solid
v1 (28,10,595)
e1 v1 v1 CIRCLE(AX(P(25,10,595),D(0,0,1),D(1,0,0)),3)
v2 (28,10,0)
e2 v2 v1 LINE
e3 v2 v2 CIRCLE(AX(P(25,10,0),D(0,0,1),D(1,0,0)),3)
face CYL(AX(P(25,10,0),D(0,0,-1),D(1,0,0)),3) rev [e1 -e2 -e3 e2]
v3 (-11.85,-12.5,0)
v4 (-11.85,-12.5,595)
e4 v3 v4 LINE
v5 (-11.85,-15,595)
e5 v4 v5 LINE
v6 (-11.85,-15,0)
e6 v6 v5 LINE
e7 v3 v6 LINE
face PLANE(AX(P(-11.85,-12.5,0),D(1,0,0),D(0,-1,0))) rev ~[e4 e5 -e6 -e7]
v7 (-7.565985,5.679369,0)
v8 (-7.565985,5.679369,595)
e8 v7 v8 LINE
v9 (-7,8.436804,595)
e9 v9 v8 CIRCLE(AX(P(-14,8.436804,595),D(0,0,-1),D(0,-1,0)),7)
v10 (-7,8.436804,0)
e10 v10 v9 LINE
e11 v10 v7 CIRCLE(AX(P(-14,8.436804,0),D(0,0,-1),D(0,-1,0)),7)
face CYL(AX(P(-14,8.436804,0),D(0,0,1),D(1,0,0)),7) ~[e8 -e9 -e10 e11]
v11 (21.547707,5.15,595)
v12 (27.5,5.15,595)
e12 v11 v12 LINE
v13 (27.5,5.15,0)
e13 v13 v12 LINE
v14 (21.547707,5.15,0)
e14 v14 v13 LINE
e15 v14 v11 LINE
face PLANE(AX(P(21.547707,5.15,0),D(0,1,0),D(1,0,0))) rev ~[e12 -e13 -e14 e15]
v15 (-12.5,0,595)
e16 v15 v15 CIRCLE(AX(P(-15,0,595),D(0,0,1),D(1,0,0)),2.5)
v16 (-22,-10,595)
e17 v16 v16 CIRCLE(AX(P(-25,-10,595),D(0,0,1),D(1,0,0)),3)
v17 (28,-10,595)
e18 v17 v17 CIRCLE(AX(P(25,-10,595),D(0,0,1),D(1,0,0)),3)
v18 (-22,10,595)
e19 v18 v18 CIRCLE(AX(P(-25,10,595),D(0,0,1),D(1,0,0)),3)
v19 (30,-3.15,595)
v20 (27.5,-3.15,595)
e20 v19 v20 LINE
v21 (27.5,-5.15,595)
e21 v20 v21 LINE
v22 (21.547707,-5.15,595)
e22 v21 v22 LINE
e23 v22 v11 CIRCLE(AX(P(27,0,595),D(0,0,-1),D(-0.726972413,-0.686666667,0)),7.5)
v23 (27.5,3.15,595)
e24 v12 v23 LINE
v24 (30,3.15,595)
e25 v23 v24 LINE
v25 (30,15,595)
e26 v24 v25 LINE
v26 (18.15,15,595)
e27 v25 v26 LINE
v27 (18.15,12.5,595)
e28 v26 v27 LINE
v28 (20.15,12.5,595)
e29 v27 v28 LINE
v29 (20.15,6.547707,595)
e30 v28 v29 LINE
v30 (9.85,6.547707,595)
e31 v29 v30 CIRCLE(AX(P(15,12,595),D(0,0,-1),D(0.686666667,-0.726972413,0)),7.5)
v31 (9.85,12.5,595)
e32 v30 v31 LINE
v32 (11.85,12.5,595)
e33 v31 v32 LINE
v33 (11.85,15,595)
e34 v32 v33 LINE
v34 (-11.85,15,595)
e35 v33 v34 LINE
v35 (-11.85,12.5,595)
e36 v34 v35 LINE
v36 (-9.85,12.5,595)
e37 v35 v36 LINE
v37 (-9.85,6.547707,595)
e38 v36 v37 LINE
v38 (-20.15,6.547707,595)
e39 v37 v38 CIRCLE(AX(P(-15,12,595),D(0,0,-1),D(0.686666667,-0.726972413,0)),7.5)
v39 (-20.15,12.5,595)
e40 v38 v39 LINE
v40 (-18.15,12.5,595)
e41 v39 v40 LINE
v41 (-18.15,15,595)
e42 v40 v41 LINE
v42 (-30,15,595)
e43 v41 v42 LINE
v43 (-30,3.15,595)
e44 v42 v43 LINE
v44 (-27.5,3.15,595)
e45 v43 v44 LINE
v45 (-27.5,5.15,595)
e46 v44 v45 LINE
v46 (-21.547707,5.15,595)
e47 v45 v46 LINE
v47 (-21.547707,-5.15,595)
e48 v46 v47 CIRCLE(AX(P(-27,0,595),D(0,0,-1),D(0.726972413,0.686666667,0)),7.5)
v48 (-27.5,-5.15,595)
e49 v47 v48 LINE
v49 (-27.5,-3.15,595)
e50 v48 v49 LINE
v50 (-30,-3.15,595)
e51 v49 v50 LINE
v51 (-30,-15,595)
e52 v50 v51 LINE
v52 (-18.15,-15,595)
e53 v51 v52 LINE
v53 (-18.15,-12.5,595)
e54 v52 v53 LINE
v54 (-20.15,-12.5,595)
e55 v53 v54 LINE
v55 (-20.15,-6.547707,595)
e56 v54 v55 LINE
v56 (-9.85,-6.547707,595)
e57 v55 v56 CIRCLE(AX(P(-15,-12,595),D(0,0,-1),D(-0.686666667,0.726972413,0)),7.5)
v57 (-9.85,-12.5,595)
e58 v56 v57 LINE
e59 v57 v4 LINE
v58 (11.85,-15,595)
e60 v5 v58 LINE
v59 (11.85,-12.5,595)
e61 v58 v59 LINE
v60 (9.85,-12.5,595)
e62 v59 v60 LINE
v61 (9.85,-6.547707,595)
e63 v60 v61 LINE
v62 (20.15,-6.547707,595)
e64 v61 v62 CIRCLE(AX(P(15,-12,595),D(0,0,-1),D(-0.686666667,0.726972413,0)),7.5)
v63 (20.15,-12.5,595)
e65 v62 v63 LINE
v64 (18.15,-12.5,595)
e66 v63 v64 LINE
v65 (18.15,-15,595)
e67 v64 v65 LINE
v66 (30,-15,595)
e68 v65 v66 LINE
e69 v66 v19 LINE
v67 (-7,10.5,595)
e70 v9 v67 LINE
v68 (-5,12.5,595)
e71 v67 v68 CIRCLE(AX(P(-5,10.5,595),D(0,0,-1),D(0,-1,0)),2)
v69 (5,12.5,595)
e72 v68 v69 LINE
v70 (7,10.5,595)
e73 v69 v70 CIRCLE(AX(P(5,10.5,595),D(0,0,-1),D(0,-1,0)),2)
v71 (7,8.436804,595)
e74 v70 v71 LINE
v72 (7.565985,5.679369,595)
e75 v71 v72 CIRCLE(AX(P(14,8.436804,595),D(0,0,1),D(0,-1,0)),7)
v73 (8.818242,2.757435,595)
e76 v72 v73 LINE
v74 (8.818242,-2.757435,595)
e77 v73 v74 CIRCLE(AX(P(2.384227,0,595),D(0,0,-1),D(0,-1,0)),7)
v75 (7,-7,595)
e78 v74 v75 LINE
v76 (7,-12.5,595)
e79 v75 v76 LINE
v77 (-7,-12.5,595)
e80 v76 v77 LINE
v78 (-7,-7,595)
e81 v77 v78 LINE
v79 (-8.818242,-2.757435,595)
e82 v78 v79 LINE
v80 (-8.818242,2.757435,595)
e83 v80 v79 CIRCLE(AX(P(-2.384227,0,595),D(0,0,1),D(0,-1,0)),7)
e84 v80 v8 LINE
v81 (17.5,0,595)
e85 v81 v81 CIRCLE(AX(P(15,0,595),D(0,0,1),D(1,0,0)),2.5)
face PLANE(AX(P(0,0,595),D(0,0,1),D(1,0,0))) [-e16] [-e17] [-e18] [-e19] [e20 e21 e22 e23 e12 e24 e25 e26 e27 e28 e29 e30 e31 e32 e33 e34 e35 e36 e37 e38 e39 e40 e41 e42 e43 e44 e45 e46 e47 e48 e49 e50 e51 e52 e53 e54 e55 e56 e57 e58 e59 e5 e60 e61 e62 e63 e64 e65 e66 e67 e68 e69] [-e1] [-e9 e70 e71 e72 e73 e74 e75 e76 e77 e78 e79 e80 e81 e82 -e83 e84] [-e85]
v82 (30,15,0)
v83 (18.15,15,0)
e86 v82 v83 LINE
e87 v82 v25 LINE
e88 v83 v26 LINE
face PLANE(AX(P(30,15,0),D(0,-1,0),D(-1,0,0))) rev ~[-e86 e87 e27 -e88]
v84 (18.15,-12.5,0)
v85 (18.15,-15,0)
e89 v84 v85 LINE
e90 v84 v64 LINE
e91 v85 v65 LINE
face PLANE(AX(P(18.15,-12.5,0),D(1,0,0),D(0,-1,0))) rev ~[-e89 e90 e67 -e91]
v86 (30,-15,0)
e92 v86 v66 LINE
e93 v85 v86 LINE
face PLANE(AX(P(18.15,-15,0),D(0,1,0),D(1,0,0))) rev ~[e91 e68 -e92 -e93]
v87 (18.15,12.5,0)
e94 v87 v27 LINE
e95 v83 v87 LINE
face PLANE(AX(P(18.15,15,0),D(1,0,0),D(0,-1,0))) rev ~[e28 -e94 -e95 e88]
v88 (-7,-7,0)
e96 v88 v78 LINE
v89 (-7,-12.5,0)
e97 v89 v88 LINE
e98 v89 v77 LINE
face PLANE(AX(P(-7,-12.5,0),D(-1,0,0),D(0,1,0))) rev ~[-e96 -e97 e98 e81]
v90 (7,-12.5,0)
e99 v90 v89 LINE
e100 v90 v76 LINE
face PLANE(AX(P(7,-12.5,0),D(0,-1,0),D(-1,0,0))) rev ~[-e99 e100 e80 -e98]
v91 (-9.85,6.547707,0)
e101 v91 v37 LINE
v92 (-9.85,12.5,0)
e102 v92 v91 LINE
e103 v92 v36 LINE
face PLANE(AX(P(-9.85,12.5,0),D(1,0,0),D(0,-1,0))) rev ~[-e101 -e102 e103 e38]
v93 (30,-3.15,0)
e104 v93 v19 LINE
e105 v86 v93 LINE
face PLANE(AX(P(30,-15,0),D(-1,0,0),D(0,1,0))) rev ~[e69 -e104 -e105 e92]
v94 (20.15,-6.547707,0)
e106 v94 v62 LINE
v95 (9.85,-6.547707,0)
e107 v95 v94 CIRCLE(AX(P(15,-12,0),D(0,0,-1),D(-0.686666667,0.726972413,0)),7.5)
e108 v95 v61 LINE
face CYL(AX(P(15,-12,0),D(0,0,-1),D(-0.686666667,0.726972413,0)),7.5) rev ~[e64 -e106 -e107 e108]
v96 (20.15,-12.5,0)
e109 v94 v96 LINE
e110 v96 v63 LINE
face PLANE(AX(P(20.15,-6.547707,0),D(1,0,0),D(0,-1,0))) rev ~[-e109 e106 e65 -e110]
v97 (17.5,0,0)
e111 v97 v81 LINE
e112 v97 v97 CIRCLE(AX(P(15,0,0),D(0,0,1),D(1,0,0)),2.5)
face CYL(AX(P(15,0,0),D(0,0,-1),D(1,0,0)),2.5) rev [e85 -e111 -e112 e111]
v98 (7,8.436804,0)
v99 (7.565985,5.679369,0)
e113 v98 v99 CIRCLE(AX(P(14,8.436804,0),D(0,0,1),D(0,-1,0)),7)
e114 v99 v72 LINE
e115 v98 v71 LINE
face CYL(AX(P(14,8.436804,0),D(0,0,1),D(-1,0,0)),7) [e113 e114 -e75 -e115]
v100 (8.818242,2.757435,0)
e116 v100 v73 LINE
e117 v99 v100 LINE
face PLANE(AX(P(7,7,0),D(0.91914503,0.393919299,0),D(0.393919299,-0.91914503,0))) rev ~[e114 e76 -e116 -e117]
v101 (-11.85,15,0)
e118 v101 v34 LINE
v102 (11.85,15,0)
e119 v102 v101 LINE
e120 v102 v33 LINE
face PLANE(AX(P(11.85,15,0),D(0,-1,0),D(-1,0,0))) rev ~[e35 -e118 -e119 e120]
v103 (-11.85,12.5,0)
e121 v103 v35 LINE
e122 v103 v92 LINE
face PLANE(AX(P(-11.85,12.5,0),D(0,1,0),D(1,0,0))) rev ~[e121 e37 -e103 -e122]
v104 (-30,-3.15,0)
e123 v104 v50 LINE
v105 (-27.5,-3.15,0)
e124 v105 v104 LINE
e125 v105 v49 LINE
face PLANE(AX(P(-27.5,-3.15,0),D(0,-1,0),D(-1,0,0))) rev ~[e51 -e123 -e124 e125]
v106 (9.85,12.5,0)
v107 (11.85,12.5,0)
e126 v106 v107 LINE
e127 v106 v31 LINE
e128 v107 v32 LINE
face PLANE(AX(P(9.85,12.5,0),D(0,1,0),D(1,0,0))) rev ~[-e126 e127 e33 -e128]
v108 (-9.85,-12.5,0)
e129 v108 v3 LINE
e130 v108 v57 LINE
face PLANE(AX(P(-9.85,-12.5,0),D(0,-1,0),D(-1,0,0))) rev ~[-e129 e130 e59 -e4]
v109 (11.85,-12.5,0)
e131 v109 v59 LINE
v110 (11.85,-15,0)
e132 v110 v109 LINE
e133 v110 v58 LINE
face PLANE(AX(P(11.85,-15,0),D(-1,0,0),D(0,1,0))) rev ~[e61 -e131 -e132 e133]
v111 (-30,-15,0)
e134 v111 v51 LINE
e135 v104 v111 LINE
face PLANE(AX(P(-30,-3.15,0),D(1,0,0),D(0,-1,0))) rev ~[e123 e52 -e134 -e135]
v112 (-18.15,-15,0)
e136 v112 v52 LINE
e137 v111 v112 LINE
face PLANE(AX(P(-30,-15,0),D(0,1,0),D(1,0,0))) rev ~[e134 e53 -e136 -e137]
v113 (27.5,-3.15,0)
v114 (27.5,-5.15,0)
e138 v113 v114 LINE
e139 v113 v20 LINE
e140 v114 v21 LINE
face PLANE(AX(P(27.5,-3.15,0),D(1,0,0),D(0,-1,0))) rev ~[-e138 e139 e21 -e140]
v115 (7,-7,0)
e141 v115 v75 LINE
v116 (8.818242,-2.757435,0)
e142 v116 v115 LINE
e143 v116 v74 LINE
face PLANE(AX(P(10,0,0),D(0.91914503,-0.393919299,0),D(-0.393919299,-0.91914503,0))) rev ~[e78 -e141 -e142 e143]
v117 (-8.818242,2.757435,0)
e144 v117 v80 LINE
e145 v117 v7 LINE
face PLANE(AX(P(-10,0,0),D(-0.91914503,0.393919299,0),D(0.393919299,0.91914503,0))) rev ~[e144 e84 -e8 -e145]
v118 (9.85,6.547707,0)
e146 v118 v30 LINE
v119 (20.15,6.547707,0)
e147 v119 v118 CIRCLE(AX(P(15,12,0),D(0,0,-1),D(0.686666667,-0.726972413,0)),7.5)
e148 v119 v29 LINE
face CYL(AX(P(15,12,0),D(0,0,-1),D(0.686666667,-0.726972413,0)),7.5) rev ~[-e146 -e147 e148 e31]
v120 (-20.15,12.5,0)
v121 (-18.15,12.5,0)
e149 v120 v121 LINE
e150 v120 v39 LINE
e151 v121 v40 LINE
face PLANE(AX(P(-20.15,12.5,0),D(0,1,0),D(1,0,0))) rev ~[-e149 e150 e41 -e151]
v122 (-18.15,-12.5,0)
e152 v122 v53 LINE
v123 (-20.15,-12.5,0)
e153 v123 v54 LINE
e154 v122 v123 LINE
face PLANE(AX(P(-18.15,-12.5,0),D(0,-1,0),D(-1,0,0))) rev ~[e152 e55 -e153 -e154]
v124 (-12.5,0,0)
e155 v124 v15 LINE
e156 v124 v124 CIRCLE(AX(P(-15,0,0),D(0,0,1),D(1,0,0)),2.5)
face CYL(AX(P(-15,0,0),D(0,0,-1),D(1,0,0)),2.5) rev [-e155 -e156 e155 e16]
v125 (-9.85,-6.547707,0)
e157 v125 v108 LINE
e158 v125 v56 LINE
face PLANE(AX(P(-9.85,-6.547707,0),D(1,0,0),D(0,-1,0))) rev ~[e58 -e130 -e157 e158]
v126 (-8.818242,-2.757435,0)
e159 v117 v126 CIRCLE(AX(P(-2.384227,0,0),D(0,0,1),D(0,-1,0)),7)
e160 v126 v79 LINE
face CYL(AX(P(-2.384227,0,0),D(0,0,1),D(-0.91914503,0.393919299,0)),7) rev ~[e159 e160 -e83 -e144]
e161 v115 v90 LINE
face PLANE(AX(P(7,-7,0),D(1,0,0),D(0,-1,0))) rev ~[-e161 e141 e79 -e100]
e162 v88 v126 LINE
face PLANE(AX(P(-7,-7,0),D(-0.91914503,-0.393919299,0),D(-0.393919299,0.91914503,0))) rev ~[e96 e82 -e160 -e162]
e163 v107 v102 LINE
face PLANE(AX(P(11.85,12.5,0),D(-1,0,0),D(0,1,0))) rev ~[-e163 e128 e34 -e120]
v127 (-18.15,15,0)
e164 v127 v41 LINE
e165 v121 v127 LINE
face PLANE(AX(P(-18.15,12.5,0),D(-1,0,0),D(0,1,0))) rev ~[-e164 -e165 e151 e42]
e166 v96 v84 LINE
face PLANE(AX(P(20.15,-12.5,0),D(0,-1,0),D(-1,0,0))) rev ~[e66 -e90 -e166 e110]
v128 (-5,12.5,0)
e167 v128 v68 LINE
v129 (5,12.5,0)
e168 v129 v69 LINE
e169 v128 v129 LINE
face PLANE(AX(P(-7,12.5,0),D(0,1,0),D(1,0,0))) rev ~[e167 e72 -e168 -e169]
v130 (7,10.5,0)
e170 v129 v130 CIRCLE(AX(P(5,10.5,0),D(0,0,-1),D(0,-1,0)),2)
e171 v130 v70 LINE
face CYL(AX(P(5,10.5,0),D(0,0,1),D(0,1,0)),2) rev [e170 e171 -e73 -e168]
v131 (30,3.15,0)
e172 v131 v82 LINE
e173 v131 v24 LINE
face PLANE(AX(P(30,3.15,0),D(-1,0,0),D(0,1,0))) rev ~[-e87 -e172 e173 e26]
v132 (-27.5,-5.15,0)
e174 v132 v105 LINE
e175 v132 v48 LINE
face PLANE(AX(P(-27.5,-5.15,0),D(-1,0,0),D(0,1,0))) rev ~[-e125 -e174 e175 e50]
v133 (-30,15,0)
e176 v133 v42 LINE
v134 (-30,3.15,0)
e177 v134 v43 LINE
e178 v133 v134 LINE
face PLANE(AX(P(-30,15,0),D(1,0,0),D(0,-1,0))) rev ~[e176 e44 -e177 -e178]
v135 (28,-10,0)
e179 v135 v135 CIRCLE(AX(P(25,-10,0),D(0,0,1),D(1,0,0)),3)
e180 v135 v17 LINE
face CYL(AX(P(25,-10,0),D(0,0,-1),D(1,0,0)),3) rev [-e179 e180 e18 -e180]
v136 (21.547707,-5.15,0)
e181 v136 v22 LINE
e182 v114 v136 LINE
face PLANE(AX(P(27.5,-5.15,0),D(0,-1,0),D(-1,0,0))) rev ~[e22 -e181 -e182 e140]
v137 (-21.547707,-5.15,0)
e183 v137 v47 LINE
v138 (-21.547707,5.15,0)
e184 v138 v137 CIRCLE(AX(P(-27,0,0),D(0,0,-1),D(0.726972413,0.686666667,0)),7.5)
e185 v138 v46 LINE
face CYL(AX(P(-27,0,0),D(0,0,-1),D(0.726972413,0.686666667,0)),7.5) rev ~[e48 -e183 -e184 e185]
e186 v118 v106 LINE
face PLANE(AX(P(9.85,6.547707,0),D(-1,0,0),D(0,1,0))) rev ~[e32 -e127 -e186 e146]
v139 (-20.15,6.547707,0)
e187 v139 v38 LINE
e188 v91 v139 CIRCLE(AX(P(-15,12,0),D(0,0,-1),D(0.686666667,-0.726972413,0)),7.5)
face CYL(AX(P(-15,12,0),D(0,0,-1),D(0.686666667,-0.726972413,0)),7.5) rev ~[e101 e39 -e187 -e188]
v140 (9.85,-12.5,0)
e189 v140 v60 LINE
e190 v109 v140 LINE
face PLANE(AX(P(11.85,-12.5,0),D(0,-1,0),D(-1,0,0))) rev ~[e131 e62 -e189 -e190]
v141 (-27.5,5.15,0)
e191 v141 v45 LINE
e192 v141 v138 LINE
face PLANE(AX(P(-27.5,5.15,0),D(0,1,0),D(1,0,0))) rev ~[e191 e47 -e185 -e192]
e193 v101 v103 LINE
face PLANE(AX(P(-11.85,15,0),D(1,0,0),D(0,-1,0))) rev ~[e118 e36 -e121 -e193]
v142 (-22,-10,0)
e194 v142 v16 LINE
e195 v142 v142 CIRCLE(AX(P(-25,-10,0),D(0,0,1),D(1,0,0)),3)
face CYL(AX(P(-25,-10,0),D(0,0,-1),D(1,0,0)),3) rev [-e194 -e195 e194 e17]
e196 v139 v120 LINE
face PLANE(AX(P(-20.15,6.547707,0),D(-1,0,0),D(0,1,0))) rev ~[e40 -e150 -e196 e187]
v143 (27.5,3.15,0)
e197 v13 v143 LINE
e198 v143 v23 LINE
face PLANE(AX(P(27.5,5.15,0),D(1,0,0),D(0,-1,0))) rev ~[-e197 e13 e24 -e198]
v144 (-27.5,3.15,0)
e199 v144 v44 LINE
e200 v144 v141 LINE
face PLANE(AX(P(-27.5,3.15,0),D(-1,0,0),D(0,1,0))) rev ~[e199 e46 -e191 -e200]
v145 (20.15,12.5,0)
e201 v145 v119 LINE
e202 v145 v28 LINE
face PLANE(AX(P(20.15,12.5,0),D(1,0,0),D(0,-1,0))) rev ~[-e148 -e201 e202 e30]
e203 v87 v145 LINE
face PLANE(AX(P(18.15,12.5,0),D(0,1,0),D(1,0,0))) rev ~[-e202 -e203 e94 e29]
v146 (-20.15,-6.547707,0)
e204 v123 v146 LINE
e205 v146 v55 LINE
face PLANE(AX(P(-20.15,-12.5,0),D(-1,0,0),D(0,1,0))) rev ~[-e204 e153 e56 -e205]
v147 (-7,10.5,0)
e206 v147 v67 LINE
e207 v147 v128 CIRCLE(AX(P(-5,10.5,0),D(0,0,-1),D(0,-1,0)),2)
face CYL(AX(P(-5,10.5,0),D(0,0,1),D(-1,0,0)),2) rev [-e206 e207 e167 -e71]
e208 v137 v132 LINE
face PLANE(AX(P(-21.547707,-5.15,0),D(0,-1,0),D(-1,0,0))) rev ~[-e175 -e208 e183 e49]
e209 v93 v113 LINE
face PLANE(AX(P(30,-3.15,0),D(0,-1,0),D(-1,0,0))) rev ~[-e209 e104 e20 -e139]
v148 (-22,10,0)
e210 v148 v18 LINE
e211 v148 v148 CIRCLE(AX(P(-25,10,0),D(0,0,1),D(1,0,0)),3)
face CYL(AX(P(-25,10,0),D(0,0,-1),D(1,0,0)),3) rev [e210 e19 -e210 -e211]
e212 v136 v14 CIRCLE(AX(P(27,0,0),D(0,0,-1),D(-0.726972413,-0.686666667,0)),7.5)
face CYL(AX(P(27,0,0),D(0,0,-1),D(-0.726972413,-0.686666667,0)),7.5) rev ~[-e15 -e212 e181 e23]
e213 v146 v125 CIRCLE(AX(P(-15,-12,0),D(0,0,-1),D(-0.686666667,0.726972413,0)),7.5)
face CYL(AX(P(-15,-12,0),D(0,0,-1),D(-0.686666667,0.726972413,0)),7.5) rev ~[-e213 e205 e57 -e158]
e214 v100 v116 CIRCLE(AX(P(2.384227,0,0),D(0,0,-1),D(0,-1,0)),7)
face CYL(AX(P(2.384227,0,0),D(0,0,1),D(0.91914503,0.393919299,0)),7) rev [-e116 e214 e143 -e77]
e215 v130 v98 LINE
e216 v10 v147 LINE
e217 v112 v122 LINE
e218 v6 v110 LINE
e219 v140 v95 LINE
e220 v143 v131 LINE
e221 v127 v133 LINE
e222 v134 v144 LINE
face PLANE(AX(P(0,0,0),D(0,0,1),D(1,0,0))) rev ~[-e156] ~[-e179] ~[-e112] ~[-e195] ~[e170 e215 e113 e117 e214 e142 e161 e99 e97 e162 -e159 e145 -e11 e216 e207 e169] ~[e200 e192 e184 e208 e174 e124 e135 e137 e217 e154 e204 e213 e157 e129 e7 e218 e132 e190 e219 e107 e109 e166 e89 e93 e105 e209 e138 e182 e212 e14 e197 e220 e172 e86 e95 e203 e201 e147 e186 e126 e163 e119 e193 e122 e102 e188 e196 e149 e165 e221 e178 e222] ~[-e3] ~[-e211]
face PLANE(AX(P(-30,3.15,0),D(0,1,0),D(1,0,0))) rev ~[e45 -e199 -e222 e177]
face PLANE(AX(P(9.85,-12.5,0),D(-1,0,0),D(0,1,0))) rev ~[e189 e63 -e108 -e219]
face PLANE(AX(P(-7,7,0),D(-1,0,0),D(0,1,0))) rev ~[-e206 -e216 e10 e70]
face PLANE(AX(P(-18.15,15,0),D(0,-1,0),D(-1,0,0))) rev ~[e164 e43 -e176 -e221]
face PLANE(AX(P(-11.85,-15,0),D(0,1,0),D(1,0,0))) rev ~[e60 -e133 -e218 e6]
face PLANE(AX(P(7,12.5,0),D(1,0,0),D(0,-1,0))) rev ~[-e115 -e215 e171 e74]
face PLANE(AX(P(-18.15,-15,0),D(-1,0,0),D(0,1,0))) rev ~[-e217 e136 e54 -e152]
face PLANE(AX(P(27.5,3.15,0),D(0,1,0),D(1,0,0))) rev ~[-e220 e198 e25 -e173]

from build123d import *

# Parameters (mm, degrees)
F0_R     = 3
F0_R_2   = 2.5
F1_DEPTH = 595
F2_R     = 2
F3_R     = 7


# Not quite as in the source:
# - a feature names something its author has since deleted; it is built from what else it names


with BuildPart() as f1:
    # F0 (on Top) → F1 (new body)
    with BuildSketch(Plane.XY):
        with BuildLine():
            Line((18.15, -15), (30, -15))
            Line((30, -15), (30, -3.15))
            Line((30, -3.15), (27.5, -3.15))
            Line((27.5, -3.15), (27.5, -5.15))
            Line((27.5, -5.15), (21.5477069044, -5.15))
            ThreePointArc((21.5477069044, -5.15), (19.5, 0), (21.5477069044, 5.15))
            Line((21.5477069044, 5.15), (27.5, 5.15))
            Line((27.5, 5.15), (27.5, 3.15))
            Line((27.5, 3.15), (30, 3.15))
            Line((30, 3.15), (30, 15))
            Line((30, 15), (18.15, 15))
            Line((18.15, 15), (18.15, 12.5))
            Line((18.15, 12.5), (20.15, 12.5))
            Line((20.15, 12.5), (20.15, 6.5477069044))
            ThreePointArc((20.15, 6.5477069044), (15, 4.5), (9.85, 6.5477069044))
            Line((9.85, 6.5477069044), (9.85, 12.5))
            Line((9.85, 12.5), (11.85, 12.5))
            Line((11.85, 12.5), (11.85, 15))
            Line((11.85, 15), (-11.85, 15))
            Line((-11.85, 15), (-11.85, 12.5))
            Line((-11.85, 12.5), (-9.85, 12.5))
            Line((-9.85, 12.5), (-9.85, 6.5477069044))
            ThreePointArc((-9.85, 6.5477069044), (-15, 4.5), (-20.15, 6.5477069044))
            Line((-20.15, 6.5477069044), (-20.15, 12.5))
            Line((-20.15, 12.5), (-18.15, 12.5))
            Line((-18.15, 12.5), (-18.15, 15))
            Line((-18.15, 15), (-30, 15))
            Line((-30, 15), (-30, 3.15))
            Line((-30, 3.15), (-27.5, 3.15))
            Line((-27.5, 3.15), (-27.5, 5.15))
            Line((-27.5, 5.15), (-21.5477069044, 5.15))
            ThreePointArc((-21.5477069044, 5.15), (-19.5, 0), (-21.5477069044, -5.15))
            Line((-21.5477069044, -5.15), (-27.5, -5.15))
            Line((-27.5, -5.15), (-27.5, -3.15))
            Line((-27.5, -3.15), (-30, -3.15))
            Line((-30, -3.15), (-30, -15))
            Line((-30, -15), (-18.15, -15))
            Line((-18.15, -15), (-18.15, -12.5))
            Line((-18.15, -12.5), (-20.15, -12.5))
            Line((-20.15, -12.5), (-20.15, -6.5477069044))
            ThreePointArc((-20.15, -6.5477069044), (-15, -4.5), (-9.85, -6.5477069044))
            Line((-9.85, -6.5477069044), (-9.85, -12.5))
            Line((-9.85, -12.5), (-11.85, -12.5))
            Line((-11.85, -12.5), (-11.85, -15))
            Line((-11.85, -15), (11.85, -15))
            Line((11.85, -15), (11.85, -12.5))
            Line((11.85, -12.5), (9.85, -12.5))
            Line((9.85, -12.5), (9.85, -6.5477069044))
            ThreePointArc((9.85, -6.5477069044), (15, -4.5), (20.15, -6.5477069044))
            Line((20.15, -6.5477069044), (20.15, -12.5))
            Line((20.15, -12.5), (18.15, -12.5))
            Line((18.15, -12.5), (18.15, -15))
        make_face()
        with Locations((-25, -10)):
            Circle(F0_R, mode=Mode.SUBTRACT)
        with Locations((25, -10)):
            Circle(F0_R, mode=Mode.SUBTRACT)
        with Locations((-15, 0)):
            Circle(F0_R_2, mode=Mode.SUBTRACT)
        with Locations((-25, 10)):
            Circle(F0_R, mode=Mode.SUBTRACT)
        Polygon((-7, 7), (-7, 12.5), (0, 12.5), (7, 12.5), (7, 7), (10, 0), (7, -7), (7, -12.5), (0, -12.5), (-7, -12.5), (-7, -7), (-10, 0), align=None, mode=Mode.SUBTRACT)
        with Locations((15, 0)):
            Circle(F0_R_2, mode=Mode.SUBTRACT)
        with Locations((25, 10)):
            Circle(F0_R, mode=Mode.SUBTRACT)
    extrude(amount=F1_DEPTH)

    # F2
    f2_edges = [f1.edges().sort_by_distance(p)[0] for p in [
        (-7, 12.5, 297.5),
        (7, 12.5, 297.5),
    ]]
    fillet(f2_edges, radius=F2_R)

    # F3
    f3_edges = [f1.edges().sort_by_distance(p)[0] for p in [
        (-7, 7, 297.5),
        (-10, 0, 297.5),
        (7, 7, 297.5),
        (10, 0, 297.5),
    ]]
    fillet(f3_edges, radius=F3_R)


solid = f1.part
